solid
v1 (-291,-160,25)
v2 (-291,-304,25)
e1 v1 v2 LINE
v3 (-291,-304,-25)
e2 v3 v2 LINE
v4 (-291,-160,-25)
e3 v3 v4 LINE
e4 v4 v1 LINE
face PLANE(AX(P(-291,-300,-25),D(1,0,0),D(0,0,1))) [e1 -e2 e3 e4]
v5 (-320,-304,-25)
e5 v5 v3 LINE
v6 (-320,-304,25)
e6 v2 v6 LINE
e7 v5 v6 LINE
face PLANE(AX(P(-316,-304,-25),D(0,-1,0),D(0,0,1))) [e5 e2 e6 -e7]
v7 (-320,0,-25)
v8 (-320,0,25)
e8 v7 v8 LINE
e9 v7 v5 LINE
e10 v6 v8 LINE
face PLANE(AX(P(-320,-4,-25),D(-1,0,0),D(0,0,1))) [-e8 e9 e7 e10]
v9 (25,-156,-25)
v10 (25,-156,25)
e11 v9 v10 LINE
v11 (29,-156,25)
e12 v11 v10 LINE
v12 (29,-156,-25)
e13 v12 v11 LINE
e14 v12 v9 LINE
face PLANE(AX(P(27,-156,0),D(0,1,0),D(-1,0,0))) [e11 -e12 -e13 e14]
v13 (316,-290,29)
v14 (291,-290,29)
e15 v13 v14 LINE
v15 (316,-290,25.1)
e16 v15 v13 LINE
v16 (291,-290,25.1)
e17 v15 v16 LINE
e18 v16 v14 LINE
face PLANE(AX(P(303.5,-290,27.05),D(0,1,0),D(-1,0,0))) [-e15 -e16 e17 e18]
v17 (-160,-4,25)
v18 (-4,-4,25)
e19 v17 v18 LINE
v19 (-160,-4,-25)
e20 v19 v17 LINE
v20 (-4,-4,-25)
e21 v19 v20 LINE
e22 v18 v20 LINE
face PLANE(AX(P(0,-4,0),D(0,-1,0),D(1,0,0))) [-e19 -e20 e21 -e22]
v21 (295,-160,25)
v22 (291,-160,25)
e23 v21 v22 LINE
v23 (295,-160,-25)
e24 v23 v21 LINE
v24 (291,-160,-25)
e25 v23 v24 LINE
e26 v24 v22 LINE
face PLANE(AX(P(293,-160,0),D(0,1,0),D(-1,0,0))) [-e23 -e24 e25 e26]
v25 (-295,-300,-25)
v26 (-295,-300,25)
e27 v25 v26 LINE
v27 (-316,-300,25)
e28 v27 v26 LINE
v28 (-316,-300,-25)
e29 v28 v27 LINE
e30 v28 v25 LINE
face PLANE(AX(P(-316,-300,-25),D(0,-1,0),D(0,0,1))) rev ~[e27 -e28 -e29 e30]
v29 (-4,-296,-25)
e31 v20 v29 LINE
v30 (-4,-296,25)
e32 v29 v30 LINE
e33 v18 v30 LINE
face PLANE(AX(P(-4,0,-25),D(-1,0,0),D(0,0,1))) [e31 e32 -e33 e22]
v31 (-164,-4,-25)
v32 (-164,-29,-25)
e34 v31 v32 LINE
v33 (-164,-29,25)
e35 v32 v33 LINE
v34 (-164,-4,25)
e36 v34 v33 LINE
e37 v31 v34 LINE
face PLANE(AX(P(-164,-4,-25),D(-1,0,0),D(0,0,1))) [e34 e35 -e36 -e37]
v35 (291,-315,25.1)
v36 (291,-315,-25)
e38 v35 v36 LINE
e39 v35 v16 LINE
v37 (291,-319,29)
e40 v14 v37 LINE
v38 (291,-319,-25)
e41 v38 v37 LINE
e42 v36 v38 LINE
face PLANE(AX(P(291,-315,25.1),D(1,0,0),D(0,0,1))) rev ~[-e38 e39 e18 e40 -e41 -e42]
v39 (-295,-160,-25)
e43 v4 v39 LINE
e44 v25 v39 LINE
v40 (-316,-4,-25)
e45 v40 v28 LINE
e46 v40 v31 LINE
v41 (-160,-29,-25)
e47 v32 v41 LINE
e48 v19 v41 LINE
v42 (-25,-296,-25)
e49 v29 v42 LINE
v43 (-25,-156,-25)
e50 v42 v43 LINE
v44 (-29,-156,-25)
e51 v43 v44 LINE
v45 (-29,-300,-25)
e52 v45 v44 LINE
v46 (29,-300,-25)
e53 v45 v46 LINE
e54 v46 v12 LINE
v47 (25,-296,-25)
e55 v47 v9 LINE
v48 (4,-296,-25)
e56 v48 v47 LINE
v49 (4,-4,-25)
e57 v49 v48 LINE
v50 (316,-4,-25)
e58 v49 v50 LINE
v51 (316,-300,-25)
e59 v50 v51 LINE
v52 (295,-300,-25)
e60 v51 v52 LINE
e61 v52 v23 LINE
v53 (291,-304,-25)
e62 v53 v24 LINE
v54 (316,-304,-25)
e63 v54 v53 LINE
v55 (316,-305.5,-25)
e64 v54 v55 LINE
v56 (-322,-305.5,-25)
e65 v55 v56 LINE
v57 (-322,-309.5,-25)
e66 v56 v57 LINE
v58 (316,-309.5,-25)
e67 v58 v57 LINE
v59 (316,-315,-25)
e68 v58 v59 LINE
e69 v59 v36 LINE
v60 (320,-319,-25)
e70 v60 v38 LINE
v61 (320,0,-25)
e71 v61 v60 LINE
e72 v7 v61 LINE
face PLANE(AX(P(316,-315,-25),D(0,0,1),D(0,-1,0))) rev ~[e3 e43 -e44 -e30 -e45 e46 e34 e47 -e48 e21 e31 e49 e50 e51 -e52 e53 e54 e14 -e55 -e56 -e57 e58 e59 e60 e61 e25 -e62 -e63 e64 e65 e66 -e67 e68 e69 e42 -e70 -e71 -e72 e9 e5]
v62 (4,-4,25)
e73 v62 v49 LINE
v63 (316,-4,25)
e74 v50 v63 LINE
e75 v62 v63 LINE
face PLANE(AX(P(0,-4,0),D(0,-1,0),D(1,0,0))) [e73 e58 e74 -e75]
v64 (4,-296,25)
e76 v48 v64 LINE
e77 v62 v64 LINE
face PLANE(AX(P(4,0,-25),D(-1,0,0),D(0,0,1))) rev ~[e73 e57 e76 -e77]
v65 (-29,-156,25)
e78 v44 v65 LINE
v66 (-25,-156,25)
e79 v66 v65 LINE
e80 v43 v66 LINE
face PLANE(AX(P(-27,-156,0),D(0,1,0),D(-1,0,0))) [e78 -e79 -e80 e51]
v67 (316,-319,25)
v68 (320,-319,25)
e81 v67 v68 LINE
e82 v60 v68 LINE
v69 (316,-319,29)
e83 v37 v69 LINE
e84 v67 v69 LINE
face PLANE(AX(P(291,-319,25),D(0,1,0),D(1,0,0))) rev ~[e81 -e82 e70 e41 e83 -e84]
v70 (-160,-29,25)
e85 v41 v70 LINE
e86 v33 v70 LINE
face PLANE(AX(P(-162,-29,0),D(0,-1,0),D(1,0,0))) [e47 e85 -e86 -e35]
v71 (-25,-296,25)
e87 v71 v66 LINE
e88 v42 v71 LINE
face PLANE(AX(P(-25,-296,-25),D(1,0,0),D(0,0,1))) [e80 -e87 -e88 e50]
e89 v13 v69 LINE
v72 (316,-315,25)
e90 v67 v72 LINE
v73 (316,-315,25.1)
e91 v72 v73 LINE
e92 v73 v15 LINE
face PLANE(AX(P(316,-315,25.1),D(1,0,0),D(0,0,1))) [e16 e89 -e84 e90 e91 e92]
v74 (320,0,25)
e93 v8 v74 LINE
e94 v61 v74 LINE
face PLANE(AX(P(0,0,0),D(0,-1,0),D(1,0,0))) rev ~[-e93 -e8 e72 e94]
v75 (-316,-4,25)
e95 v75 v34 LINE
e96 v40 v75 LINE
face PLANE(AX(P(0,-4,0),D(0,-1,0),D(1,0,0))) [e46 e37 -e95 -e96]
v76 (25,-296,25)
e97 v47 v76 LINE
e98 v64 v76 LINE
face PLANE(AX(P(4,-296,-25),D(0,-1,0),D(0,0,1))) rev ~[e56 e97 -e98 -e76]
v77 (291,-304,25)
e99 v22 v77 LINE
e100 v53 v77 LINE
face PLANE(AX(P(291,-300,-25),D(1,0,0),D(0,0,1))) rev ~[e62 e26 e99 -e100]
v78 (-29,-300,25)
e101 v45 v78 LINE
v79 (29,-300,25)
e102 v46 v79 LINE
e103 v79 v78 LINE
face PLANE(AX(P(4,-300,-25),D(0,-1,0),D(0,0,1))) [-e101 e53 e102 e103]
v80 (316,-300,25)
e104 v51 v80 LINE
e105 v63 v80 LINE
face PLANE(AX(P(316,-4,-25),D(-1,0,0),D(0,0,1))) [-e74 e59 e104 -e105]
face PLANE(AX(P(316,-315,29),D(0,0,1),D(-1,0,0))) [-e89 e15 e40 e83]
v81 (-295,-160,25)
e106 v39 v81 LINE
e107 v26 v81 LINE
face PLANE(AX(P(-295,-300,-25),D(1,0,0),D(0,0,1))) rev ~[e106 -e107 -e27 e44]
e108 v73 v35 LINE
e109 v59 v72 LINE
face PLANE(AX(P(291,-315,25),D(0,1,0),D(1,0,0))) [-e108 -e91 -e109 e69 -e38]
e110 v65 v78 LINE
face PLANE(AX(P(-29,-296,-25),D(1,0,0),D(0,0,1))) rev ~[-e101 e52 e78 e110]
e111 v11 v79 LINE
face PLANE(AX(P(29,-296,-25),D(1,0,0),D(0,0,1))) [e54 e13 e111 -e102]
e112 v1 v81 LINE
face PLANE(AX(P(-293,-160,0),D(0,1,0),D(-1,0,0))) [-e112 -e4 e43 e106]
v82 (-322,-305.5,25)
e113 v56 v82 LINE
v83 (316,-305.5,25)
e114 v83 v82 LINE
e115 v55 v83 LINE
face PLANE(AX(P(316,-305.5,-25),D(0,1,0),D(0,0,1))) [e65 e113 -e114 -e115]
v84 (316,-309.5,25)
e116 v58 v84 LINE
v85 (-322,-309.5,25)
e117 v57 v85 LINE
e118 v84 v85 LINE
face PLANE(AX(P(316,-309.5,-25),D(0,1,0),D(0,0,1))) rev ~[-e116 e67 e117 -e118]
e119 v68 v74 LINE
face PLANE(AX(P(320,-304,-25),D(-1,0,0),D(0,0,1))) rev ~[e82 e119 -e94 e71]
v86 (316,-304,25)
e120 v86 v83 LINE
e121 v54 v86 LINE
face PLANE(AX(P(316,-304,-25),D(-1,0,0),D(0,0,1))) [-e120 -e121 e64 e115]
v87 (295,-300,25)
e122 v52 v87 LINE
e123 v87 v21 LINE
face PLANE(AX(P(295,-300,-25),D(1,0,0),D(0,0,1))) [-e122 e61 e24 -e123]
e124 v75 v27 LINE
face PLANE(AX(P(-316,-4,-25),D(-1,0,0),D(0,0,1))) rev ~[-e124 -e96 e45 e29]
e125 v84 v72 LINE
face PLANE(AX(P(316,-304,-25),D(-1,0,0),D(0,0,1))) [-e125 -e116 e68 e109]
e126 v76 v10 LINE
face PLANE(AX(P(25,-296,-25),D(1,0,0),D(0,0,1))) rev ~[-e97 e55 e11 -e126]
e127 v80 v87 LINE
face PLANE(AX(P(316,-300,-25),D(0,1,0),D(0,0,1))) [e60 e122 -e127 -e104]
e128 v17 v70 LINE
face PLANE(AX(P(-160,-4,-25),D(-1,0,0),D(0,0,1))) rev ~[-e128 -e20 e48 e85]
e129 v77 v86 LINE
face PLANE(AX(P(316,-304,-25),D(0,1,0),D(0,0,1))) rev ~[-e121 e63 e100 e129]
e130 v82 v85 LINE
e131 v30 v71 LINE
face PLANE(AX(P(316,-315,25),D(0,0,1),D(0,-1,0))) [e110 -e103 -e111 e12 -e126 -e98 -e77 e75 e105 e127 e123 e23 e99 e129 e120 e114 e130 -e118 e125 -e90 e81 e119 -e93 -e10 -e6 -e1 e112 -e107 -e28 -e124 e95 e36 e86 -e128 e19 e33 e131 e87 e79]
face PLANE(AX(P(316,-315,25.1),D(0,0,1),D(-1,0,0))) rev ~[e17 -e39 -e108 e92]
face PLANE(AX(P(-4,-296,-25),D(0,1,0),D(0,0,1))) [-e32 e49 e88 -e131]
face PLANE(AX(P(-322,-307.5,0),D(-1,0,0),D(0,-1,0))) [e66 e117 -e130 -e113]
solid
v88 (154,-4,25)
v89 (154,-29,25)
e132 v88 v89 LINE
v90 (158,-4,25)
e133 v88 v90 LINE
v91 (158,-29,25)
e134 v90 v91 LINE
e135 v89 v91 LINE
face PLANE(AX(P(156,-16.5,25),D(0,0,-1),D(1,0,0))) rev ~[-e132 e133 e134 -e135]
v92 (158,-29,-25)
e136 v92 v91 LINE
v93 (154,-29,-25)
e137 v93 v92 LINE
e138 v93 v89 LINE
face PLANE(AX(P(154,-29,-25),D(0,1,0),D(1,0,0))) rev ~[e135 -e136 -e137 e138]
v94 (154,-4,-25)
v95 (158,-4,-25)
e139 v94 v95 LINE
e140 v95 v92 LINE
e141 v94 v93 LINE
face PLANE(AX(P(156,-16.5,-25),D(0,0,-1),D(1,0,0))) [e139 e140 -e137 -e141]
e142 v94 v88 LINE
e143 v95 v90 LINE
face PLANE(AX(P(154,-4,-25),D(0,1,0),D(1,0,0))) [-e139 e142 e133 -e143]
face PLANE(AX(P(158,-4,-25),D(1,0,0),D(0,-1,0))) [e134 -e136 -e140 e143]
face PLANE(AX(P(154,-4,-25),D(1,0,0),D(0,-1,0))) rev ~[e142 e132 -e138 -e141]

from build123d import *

# Parameters (mm, degrees)
F0_W      = 640
F0_H      = 50
F1_DEPTH  = 4
F2_W      = 4
F2_H      = 50
F3_DEPTH  = 300
F4_W      = 4
F4_H      = 50
F5_DEPTH  = 300
F6_W      = 4
F6_H      = 50
F7_DEPTH  = 25
F8_W      = 4
F8_H      = 50
F9_DEPTH  = 25
F10_W     = 8
F10_H     = 50
F11_DEPTH = 300
F12_W     = 4
F12_H     = 50
F13_DEPTH = 25
F14_W     = 4
F14_H     = 50
F15_DEPTH = 25
F16_W     = 4
F16_H     = 50
F17_DEPTH = 140
F18_W     = 4
F18_H     = 50
F19_DEPTH = 140
F22_W     = 4
F22_H     = 50
F23_DEPTH = 25
F24_W     = 4
F24_H     = 50
F25_DEPTH = 140
F26_W     = 4
F26_H     = 50
F27_DEPTH = 140
F28_W     = 4
F28_H     = 25
F29_DEPTH = 50
F31_W     = 4
F31_H     = 50
F32_DEPTH = 15
F33_W     = 4
F33_H     = 50
F34_DEPTH = 25
F35_W     = 25
F35_H     = 4
F36_DEPTH = 4
F37_W     = 25
F37_H     = 3.9
F38_DEPTH = 25
F39_W     = 4
F39_H     = 50
F40_DEPTH = 638


# Not quite as in the source:
# - a feature of the source that left no trace in its solid (it failed there, or was rolled back) is left out
# - the program builds the solid bodies; features that only make, move or delete a surface that nothing else refers to are left out


with BuildPart() as f1:
    # F0 (on Front) → F1 (new body)
    with BuildSketch(Plane.XZ):
        Rectangle(F0_W, F0_H)
    extrude(amount=F1_DEPTH)

    # F2 (on face) → F3 (join)
    with BuildSketch(Plane.XZ.offset(4)):
        with Locations((-318, 0)):
            Rectangle(F2_W, F2_H)
    extrude(amount=F3_DEPTH)

    # F4 (on face) → F5 (join)
    with BuildSketch(Plane.XZ.offset(4)):
        with Locations((318, 0)):
            Rectangle(F4_W, F4_H)
    extrude(amount=F5_DEPTH)

    # F6 (on face) → F7 (join)
    with BuildSketch(Plane.YZ.offset(-316)):
        with Locations((-302, 0)):
            Rectangle(F6_W, F6_H)
    extrude(amount=F7_DEPTH)

    # F8 (on face) → F9 (join)
    with BuildSketch(Plane(origin=(316, 0, 0), x_dir=(0, -1, 0), z_dir=(-1, 0, 0))):
        with Locations((302, 0)):
            Rectangle(F8_W, F8_H)
    extrude(amount=F9_DEPTH)

    # F10 (on Front) → F11 (join)
    with BuildSketch(Plane.XZ):
        Rectangle(F10_W, F10_H)
    extrude(amount=F11_DEPTH)

    # F12 (on face) → F13 (join)
    with BuildSketch(Plane.XZ.offset(4)):
        with Locations((-162, 0)):
            Rectangle(F12_W, F12_H)
    extrude(amount=F13_DEPTH)

    # F14 (on face) → F15 (join)
    with BuildSketch(Plane(origin=(-4, 0, 0), x_dir=(0, -1, 0), z_dir=(-1, 0, 0))):
        with Locations((298, 0)):
            Rectangle(F14_W, F14_H)
    extrude(amount=F15_DEPTH)

    # F16 (on face) → F17 (join)
    with BuildSketch(Plane(origin=(0, -300, 0), x_dir=(-1, 0, 0), z_dir=(0, 1, 0))):
        with Locations((293, 0)):
            Rectangle(F16_W, F16_H)
    extrude(amount=F17_DEPTH)

    # F18 (on face) → F19 (join)
    with BuildSketch(Plane(origin=(0, -296, 0), x_dir=(-1, 0, 0), z_dir=(0, 1, 0))):
        with Locations((27, 0)):
            Rectangle(F18_W, F18_H)
    extrude(amount=F19_DEPTH)

    # F22 (on face) → F23 (join)
    with BuildSketch(Plane.YZ.offset(4)):
        with Locations((-298, 0)):
            Rectangle(F22_W, F22_H)
    extrude(amount=F23_DEPTH)

    # F24 (on face) → F25 (join)
    with BuildSketch(Plane(origin=(0, -296, 0), x_dir=(-1, 0, 0), z_dir=(0, 1, 0))):
        with Locations((-27, 0)):
            Rectangle(F24_W, F24_H)
    extrude(amount=F25_DEPTH)

    # F26 (on face) → F27 (join)
    with BuildSketch(Plane(origin=(0, -300, 0), x_dir=(-1, 0, 0), z_dir=(0, 1, 0))):
        with Locations((-293, 0)):
            Rectangle(F26_W, F26_H)
    extrude(amount=F27_DEPTH)

    # F31 (on face) → F32 (join)
    with BuildSketch(Plane.XZ.offset(304)):
        with Locations((318, 0)):
            Rectangle(F31_W, F31_H)
    extrude(amount=F32_DEPTH)

    # F33 (on face) → F34 (join)
    with BuildSketch(Plane(origin=(316, 0, 0), x_dir=(0, -1, 0), z_dir=(-1, 0, 0))):
        with Locations((317, 0)):
            Rectangle(F33_W, F33_H)
    extrude(amount=F34_DEPTH)

    # F35 (on face) → F36 (join)
    with BuildSketch(Plane.XY.offset(25)):
        with Locations((303.5, -317)):
            Rectangle(F35_W, F35_H)
    extrude(amount=F36_DEPTH)

    # F37 (on face) → F38 (join)
    with BuildSketch(Plane(origin=(0, -315, 0), x_dir=(-1, 0, 0), z_dir=(0, 1, 0))):
        with Locations((-303.5, 27.05)):
            Rectangle(F37_W, F37_H)
    extrude(amount=F38_DEPTH)

    # F39 (on face) → F40 (join)
    with BuildSketch(Plane(origin=(316, 0, 0), x_dir=(0, -1, 0), z_dir=(-1, 0, 0))):
        with Locations((307.5, 0)):
            Rectangle(F39_W, F39_H)
    extrude(amount=F40_DEPTH)


with BuildPart() as f29:
    # F28 (on face) → F29 (new body)
    with BuildSketch(Plane(origin=(0, 0, -25), x_dir=(1, 0, 0), z_dir=(0, 0, -1))):
        with Locations((156, 16.5)):
            Rectangle(F28_W, F28_H)
    extrude(amount=-F29_DEPTH)


solid = Compound([f1.part, f29.part])
